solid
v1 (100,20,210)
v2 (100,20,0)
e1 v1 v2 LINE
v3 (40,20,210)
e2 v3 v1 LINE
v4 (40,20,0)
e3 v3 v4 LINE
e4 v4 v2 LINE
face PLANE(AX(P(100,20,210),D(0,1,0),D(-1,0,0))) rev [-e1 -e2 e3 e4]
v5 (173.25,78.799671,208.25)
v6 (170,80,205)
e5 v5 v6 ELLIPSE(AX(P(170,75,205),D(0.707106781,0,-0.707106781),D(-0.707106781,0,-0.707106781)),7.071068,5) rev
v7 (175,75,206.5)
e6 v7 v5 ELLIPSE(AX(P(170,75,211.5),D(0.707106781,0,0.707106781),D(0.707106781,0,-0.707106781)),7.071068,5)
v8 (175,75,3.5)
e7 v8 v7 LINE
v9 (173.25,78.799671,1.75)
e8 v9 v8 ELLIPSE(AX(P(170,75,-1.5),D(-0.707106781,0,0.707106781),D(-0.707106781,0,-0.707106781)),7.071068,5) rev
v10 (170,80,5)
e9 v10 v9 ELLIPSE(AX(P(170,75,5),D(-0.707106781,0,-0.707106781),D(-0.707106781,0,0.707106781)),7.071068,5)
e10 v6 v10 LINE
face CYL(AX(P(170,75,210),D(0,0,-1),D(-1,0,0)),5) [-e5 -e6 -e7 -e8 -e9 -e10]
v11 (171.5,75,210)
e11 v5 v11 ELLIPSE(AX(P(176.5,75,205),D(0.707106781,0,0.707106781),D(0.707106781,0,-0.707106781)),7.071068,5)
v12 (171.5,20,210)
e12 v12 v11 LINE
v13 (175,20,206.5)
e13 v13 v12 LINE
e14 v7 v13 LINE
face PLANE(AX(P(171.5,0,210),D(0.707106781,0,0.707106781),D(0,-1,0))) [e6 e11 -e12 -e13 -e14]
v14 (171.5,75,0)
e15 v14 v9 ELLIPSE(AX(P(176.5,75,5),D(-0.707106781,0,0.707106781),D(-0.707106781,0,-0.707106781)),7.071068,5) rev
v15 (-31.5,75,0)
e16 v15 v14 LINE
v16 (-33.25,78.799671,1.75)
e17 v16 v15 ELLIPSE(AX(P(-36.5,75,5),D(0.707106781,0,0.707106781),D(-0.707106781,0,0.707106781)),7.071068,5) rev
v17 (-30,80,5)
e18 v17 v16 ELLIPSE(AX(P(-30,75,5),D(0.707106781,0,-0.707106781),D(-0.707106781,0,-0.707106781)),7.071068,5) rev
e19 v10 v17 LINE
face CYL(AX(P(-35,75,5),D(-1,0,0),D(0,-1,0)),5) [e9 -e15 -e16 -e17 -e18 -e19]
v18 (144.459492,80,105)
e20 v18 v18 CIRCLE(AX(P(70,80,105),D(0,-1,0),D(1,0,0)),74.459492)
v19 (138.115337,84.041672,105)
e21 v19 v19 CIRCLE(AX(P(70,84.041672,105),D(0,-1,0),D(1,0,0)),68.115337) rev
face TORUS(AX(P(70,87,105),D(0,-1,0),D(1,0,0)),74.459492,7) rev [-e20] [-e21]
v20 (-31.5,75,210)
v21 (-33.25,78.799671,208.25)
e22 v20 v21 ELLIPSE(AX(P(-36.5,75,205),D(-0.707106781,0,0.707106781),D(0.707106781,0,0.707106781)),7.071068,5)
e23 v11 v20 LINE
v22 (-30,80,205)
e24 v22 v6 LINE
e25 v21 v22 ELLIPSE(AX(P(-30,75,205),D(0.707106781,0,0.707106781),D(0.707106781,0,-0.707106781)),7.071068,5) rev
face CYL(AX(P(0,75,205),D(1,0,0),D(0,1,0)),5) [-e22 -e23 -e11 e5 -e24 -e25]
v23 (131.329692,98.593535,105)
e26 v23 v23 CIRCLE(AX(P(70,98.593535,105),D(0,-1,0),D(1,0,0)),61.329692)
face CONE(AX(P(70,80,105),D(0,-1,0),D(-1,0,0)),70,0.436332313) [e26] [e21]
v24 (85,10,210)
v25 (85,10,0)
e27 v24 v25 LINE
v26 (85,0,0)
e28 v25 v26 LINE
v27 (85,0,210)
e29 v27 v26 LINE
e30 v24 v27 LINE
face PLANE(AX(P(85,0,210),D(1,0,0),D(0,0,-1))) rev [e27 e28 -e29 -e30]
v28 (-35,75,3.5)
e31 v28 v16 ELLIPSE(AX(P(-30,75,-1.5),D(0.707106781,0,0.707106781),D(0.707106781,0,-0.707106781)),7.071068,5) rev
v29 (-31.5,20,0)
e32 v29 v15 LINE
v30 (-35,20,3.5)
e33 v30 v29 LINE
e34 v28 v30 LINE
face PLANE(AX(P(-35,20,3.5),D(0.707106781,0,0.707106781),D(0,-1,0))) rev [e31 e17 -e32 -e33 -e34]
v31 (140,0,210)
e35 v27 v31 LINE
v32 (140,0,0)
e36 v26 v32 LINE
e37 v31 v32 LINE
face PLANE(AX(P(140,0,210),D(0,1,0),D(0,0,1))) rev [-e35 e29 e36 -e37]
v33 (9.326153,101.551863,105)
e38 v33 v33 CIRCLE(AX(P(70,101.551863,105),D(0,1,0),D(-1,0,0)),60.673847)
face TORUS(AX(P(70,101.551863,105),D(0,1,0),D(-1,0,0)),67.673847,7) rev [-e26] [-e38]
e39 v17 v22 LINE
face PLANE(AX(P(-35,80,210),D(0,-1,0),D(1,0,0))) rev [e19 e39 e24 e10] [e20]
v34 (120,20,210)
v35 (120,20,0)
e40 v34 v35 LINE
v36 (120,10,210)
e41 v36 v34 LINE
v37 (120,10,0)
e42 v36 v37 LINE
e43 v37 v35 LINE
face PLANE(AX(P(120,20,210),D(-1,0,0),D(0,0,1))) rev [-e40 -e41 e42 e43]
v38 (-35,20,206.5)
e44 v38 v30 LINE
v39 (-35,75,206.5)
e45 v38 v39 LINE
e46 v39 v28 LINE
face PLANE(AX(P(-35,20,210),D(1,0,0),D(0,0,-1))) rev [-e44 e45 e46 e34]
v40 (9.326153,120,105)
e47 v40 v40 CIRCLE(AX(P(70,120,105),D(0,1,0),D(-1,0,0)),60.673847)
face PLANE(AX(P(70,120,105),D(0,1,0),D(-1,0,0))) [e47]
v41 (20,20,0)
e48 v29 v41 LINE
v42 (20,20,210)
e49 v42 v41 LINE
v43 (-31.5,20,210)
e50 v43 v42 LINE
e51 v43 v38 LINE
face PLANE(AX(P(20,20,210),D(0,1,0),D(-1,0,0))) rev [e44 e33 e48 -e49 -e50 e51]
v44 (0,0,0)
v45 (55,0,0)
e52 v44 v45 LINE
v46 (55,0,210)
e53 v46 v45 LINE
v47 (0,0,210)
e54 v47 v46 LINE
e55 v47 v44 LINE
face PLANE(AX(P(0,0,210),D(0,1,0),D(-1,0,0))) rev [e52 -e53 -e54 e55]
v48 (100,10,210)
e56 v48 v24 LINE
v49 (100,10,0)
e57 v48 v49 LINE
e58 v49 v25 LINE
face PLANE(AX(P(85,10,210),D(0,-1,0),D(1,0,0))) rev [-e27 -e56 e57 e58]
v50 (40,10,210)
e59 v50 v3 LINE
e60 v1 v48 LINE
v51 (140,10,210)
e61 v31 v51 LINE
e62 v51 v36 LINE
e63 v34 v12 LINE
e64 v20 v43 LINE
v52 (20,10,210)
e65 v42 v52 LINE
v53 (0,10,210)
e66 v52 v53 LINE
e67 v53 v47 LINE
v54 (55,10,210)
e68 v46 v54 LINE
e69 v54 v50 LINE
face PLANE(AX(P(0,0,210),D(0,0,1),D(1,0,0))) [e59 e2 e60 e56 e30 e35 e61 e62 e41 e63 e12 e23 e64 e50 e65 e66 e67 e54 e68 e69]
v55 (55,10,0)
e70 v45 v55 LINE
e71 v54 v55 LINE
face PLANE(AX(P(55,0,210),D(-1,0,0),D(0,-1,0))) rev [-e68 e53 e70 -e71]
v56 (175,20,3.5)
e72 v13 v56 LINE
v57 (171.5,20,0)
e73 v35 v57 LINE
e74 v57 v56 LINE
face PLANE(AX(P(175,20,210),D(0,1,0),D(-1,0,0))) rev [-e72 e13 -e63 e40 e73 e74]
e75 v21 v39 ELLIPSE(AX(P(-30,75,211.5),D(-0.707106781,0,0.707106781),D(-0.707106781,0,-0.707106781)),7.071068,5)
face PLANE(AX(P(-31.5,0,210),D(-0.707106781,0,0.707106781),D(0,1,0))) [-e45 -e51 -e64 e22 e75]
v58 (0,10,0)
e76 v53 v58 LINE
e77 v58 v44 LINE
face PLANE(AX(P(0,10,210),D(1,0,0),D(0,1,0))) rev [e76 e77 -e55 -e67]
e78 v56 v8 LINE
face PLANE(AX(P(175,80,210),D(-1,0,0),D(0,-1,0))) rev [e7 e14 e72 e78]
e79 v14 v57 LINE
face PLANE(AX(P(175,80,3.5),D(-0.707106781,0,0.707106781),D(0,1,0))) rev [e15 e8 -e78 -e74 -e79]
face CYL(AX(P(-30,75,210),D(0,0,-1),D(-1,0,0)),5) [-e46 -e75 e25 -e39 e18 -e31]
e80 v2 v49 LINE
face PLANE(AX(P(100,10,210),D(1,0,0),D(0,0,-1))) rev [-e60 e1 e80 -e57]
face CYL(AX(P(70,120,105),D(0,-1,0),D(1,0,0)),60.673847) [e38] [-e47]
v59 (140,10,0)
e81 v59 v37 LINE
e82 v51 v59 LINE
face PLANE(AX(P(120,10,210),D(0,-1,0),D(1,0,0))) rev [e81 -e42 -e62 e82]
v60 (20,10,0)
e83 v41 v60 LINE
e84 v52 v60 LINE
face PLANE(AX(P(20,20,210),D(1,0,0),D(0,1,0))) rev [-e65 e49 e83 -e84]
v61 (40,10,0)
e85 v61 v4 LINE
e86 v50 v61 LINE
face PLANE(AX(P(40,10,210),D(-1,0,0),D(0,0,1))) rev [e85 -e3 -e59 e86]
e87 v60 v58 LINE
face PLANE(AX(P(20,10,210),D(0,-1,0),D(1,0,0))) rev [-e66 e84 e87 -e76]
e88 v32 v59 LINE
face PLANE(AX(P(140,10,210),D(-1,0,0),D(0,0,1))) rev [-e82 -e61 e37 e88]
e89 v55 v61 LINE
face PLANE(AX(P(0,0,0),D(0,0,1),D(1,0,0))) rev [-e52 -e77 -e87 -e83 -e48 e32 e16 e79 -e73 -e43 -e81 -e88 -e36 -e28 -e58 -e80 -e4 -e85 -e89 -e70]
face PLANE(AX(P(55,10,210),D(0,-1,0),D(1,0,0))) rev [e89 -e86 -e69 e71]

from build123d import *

# Parameters (mm, degrees)
BOSS_EXTRUDE1_DEPTH = 210
SKETCH3_R           = 70
BOSS_EXTRUDE2_DEPTH = 20
BOSS_EXTRUDE2_TAPER = 25
SKETCH4_R           = 60.673846837
BOSS_EXTRUDE3_DEPTH = 20
CHAMFER1_SIZE       = 3.5
FILLET1_R           = 7
FILLET2_R           = 5


with BuildPart() as part:
    # Sketch2 → Boss-Extrude1 (new body)
    with BuildSketch(Plane.XY):
        Polygon((0, 0), (55, 0), (55, 10), (40, 10), (40, 20), (100, 20), (100, 10), (85, 10), (85, 0), (140, 0), (140, 10), (120, 10), (120, 20), (175, 20), (175, 80), (-35, 80), (-35, 20), (20, 20), (20, 10), (0, 10), align=None)
    extrude(amount=BOSS_EXTRUDE1_DEPTH)

    # Sketch3 → Boss-Extrude2 (add)
    with BuildSketch(Plane(origin=(0, 80, 0), x_dir=(1, 0, 0), z_dir=(0, 1, 0))):
        with Locations((70, -105)):
            Circle(SKETCH3_R)
    extrude(amount=BOSS_EXTRUDE2_DEPTH, taper=BOSS_EXTRUDE2_TAPER)

    # Sketch4 → Boss-Extrude3 (add)
    with BuildSketch(Plane(origin=(0, 100, 0), x_dir=(1, 0, 0), z_dir=(0, 1, 0))):
        with Locations(Location((70, -105, 0), (0, 0, 180))):
            Circle(SKETCH4_R)
    extrude(amount=BOSS_EXTRUDE3_DEPTH)

    # Chamfer1
    chamfer1_edges = [part.edges().sort_by_distance(p)[0] for p in [
        (-35, 50, 0),
        (175, 50, 0),
        (175, 50, 210),
        (-35, 50, 210),
    ]]
    chamfer(chamfer1_edges, length=CHAMFER1_SIZE)

    # Fillet1
    fillet1_edges = [part.edges().sort_by_distance(p)[0] for p in [
        (0, 80, 105),
        (70, 100, 44.326153163),
    ]]
    fillet(fillet1_edges, radius=FILLET1_R)

    # Fillet2
    # the kernel refuses this fillet: 5 mm, written as the material it takes off along each edge
    with BuildSketch(Plane(origin=(-35, 80, -9), x_dir=(1, 0, 0), z_dir=(0, 0, 1)), Plane(origin=(184, 80, 0), x_dir=(0, 0, 1), z_dir=(-1, 0, 0))) as fillet2_piece_1:
        with BuildLine():
            CenterArc((FILLET2_R, -FILLET2_R), FILLET2_R, 90, 90)
            Line((0, -FILLET2_R), (0, 0))
            Line((0, 0), (FILLET2_R, 0))
        make_face()
    extrude(amount=228, mode=Mode.SUBTRACT)
    with BuildSketch(Plane(origin=(175, 80, -9), x_dir=(-1, 0, 0), z_dir=(0, 0, 1)), Plane(origin=(184, 80, 210), x_dir=(0, 0, -1), z_dir=(-1, 0, 0))) as fillet2_piece_2:
        with BuildLine():
            CenterArc((FILLET2_R, FILLET2_R), FILLET2_R, 180, 90)
            Line((0, FILLET2_R), (0, 0))
            Line((0, 0), (FILLET2_R, 0))
        make_face()
    extrude(amount=228, mode=Mode.SUBTRACT)


solid = part.part
